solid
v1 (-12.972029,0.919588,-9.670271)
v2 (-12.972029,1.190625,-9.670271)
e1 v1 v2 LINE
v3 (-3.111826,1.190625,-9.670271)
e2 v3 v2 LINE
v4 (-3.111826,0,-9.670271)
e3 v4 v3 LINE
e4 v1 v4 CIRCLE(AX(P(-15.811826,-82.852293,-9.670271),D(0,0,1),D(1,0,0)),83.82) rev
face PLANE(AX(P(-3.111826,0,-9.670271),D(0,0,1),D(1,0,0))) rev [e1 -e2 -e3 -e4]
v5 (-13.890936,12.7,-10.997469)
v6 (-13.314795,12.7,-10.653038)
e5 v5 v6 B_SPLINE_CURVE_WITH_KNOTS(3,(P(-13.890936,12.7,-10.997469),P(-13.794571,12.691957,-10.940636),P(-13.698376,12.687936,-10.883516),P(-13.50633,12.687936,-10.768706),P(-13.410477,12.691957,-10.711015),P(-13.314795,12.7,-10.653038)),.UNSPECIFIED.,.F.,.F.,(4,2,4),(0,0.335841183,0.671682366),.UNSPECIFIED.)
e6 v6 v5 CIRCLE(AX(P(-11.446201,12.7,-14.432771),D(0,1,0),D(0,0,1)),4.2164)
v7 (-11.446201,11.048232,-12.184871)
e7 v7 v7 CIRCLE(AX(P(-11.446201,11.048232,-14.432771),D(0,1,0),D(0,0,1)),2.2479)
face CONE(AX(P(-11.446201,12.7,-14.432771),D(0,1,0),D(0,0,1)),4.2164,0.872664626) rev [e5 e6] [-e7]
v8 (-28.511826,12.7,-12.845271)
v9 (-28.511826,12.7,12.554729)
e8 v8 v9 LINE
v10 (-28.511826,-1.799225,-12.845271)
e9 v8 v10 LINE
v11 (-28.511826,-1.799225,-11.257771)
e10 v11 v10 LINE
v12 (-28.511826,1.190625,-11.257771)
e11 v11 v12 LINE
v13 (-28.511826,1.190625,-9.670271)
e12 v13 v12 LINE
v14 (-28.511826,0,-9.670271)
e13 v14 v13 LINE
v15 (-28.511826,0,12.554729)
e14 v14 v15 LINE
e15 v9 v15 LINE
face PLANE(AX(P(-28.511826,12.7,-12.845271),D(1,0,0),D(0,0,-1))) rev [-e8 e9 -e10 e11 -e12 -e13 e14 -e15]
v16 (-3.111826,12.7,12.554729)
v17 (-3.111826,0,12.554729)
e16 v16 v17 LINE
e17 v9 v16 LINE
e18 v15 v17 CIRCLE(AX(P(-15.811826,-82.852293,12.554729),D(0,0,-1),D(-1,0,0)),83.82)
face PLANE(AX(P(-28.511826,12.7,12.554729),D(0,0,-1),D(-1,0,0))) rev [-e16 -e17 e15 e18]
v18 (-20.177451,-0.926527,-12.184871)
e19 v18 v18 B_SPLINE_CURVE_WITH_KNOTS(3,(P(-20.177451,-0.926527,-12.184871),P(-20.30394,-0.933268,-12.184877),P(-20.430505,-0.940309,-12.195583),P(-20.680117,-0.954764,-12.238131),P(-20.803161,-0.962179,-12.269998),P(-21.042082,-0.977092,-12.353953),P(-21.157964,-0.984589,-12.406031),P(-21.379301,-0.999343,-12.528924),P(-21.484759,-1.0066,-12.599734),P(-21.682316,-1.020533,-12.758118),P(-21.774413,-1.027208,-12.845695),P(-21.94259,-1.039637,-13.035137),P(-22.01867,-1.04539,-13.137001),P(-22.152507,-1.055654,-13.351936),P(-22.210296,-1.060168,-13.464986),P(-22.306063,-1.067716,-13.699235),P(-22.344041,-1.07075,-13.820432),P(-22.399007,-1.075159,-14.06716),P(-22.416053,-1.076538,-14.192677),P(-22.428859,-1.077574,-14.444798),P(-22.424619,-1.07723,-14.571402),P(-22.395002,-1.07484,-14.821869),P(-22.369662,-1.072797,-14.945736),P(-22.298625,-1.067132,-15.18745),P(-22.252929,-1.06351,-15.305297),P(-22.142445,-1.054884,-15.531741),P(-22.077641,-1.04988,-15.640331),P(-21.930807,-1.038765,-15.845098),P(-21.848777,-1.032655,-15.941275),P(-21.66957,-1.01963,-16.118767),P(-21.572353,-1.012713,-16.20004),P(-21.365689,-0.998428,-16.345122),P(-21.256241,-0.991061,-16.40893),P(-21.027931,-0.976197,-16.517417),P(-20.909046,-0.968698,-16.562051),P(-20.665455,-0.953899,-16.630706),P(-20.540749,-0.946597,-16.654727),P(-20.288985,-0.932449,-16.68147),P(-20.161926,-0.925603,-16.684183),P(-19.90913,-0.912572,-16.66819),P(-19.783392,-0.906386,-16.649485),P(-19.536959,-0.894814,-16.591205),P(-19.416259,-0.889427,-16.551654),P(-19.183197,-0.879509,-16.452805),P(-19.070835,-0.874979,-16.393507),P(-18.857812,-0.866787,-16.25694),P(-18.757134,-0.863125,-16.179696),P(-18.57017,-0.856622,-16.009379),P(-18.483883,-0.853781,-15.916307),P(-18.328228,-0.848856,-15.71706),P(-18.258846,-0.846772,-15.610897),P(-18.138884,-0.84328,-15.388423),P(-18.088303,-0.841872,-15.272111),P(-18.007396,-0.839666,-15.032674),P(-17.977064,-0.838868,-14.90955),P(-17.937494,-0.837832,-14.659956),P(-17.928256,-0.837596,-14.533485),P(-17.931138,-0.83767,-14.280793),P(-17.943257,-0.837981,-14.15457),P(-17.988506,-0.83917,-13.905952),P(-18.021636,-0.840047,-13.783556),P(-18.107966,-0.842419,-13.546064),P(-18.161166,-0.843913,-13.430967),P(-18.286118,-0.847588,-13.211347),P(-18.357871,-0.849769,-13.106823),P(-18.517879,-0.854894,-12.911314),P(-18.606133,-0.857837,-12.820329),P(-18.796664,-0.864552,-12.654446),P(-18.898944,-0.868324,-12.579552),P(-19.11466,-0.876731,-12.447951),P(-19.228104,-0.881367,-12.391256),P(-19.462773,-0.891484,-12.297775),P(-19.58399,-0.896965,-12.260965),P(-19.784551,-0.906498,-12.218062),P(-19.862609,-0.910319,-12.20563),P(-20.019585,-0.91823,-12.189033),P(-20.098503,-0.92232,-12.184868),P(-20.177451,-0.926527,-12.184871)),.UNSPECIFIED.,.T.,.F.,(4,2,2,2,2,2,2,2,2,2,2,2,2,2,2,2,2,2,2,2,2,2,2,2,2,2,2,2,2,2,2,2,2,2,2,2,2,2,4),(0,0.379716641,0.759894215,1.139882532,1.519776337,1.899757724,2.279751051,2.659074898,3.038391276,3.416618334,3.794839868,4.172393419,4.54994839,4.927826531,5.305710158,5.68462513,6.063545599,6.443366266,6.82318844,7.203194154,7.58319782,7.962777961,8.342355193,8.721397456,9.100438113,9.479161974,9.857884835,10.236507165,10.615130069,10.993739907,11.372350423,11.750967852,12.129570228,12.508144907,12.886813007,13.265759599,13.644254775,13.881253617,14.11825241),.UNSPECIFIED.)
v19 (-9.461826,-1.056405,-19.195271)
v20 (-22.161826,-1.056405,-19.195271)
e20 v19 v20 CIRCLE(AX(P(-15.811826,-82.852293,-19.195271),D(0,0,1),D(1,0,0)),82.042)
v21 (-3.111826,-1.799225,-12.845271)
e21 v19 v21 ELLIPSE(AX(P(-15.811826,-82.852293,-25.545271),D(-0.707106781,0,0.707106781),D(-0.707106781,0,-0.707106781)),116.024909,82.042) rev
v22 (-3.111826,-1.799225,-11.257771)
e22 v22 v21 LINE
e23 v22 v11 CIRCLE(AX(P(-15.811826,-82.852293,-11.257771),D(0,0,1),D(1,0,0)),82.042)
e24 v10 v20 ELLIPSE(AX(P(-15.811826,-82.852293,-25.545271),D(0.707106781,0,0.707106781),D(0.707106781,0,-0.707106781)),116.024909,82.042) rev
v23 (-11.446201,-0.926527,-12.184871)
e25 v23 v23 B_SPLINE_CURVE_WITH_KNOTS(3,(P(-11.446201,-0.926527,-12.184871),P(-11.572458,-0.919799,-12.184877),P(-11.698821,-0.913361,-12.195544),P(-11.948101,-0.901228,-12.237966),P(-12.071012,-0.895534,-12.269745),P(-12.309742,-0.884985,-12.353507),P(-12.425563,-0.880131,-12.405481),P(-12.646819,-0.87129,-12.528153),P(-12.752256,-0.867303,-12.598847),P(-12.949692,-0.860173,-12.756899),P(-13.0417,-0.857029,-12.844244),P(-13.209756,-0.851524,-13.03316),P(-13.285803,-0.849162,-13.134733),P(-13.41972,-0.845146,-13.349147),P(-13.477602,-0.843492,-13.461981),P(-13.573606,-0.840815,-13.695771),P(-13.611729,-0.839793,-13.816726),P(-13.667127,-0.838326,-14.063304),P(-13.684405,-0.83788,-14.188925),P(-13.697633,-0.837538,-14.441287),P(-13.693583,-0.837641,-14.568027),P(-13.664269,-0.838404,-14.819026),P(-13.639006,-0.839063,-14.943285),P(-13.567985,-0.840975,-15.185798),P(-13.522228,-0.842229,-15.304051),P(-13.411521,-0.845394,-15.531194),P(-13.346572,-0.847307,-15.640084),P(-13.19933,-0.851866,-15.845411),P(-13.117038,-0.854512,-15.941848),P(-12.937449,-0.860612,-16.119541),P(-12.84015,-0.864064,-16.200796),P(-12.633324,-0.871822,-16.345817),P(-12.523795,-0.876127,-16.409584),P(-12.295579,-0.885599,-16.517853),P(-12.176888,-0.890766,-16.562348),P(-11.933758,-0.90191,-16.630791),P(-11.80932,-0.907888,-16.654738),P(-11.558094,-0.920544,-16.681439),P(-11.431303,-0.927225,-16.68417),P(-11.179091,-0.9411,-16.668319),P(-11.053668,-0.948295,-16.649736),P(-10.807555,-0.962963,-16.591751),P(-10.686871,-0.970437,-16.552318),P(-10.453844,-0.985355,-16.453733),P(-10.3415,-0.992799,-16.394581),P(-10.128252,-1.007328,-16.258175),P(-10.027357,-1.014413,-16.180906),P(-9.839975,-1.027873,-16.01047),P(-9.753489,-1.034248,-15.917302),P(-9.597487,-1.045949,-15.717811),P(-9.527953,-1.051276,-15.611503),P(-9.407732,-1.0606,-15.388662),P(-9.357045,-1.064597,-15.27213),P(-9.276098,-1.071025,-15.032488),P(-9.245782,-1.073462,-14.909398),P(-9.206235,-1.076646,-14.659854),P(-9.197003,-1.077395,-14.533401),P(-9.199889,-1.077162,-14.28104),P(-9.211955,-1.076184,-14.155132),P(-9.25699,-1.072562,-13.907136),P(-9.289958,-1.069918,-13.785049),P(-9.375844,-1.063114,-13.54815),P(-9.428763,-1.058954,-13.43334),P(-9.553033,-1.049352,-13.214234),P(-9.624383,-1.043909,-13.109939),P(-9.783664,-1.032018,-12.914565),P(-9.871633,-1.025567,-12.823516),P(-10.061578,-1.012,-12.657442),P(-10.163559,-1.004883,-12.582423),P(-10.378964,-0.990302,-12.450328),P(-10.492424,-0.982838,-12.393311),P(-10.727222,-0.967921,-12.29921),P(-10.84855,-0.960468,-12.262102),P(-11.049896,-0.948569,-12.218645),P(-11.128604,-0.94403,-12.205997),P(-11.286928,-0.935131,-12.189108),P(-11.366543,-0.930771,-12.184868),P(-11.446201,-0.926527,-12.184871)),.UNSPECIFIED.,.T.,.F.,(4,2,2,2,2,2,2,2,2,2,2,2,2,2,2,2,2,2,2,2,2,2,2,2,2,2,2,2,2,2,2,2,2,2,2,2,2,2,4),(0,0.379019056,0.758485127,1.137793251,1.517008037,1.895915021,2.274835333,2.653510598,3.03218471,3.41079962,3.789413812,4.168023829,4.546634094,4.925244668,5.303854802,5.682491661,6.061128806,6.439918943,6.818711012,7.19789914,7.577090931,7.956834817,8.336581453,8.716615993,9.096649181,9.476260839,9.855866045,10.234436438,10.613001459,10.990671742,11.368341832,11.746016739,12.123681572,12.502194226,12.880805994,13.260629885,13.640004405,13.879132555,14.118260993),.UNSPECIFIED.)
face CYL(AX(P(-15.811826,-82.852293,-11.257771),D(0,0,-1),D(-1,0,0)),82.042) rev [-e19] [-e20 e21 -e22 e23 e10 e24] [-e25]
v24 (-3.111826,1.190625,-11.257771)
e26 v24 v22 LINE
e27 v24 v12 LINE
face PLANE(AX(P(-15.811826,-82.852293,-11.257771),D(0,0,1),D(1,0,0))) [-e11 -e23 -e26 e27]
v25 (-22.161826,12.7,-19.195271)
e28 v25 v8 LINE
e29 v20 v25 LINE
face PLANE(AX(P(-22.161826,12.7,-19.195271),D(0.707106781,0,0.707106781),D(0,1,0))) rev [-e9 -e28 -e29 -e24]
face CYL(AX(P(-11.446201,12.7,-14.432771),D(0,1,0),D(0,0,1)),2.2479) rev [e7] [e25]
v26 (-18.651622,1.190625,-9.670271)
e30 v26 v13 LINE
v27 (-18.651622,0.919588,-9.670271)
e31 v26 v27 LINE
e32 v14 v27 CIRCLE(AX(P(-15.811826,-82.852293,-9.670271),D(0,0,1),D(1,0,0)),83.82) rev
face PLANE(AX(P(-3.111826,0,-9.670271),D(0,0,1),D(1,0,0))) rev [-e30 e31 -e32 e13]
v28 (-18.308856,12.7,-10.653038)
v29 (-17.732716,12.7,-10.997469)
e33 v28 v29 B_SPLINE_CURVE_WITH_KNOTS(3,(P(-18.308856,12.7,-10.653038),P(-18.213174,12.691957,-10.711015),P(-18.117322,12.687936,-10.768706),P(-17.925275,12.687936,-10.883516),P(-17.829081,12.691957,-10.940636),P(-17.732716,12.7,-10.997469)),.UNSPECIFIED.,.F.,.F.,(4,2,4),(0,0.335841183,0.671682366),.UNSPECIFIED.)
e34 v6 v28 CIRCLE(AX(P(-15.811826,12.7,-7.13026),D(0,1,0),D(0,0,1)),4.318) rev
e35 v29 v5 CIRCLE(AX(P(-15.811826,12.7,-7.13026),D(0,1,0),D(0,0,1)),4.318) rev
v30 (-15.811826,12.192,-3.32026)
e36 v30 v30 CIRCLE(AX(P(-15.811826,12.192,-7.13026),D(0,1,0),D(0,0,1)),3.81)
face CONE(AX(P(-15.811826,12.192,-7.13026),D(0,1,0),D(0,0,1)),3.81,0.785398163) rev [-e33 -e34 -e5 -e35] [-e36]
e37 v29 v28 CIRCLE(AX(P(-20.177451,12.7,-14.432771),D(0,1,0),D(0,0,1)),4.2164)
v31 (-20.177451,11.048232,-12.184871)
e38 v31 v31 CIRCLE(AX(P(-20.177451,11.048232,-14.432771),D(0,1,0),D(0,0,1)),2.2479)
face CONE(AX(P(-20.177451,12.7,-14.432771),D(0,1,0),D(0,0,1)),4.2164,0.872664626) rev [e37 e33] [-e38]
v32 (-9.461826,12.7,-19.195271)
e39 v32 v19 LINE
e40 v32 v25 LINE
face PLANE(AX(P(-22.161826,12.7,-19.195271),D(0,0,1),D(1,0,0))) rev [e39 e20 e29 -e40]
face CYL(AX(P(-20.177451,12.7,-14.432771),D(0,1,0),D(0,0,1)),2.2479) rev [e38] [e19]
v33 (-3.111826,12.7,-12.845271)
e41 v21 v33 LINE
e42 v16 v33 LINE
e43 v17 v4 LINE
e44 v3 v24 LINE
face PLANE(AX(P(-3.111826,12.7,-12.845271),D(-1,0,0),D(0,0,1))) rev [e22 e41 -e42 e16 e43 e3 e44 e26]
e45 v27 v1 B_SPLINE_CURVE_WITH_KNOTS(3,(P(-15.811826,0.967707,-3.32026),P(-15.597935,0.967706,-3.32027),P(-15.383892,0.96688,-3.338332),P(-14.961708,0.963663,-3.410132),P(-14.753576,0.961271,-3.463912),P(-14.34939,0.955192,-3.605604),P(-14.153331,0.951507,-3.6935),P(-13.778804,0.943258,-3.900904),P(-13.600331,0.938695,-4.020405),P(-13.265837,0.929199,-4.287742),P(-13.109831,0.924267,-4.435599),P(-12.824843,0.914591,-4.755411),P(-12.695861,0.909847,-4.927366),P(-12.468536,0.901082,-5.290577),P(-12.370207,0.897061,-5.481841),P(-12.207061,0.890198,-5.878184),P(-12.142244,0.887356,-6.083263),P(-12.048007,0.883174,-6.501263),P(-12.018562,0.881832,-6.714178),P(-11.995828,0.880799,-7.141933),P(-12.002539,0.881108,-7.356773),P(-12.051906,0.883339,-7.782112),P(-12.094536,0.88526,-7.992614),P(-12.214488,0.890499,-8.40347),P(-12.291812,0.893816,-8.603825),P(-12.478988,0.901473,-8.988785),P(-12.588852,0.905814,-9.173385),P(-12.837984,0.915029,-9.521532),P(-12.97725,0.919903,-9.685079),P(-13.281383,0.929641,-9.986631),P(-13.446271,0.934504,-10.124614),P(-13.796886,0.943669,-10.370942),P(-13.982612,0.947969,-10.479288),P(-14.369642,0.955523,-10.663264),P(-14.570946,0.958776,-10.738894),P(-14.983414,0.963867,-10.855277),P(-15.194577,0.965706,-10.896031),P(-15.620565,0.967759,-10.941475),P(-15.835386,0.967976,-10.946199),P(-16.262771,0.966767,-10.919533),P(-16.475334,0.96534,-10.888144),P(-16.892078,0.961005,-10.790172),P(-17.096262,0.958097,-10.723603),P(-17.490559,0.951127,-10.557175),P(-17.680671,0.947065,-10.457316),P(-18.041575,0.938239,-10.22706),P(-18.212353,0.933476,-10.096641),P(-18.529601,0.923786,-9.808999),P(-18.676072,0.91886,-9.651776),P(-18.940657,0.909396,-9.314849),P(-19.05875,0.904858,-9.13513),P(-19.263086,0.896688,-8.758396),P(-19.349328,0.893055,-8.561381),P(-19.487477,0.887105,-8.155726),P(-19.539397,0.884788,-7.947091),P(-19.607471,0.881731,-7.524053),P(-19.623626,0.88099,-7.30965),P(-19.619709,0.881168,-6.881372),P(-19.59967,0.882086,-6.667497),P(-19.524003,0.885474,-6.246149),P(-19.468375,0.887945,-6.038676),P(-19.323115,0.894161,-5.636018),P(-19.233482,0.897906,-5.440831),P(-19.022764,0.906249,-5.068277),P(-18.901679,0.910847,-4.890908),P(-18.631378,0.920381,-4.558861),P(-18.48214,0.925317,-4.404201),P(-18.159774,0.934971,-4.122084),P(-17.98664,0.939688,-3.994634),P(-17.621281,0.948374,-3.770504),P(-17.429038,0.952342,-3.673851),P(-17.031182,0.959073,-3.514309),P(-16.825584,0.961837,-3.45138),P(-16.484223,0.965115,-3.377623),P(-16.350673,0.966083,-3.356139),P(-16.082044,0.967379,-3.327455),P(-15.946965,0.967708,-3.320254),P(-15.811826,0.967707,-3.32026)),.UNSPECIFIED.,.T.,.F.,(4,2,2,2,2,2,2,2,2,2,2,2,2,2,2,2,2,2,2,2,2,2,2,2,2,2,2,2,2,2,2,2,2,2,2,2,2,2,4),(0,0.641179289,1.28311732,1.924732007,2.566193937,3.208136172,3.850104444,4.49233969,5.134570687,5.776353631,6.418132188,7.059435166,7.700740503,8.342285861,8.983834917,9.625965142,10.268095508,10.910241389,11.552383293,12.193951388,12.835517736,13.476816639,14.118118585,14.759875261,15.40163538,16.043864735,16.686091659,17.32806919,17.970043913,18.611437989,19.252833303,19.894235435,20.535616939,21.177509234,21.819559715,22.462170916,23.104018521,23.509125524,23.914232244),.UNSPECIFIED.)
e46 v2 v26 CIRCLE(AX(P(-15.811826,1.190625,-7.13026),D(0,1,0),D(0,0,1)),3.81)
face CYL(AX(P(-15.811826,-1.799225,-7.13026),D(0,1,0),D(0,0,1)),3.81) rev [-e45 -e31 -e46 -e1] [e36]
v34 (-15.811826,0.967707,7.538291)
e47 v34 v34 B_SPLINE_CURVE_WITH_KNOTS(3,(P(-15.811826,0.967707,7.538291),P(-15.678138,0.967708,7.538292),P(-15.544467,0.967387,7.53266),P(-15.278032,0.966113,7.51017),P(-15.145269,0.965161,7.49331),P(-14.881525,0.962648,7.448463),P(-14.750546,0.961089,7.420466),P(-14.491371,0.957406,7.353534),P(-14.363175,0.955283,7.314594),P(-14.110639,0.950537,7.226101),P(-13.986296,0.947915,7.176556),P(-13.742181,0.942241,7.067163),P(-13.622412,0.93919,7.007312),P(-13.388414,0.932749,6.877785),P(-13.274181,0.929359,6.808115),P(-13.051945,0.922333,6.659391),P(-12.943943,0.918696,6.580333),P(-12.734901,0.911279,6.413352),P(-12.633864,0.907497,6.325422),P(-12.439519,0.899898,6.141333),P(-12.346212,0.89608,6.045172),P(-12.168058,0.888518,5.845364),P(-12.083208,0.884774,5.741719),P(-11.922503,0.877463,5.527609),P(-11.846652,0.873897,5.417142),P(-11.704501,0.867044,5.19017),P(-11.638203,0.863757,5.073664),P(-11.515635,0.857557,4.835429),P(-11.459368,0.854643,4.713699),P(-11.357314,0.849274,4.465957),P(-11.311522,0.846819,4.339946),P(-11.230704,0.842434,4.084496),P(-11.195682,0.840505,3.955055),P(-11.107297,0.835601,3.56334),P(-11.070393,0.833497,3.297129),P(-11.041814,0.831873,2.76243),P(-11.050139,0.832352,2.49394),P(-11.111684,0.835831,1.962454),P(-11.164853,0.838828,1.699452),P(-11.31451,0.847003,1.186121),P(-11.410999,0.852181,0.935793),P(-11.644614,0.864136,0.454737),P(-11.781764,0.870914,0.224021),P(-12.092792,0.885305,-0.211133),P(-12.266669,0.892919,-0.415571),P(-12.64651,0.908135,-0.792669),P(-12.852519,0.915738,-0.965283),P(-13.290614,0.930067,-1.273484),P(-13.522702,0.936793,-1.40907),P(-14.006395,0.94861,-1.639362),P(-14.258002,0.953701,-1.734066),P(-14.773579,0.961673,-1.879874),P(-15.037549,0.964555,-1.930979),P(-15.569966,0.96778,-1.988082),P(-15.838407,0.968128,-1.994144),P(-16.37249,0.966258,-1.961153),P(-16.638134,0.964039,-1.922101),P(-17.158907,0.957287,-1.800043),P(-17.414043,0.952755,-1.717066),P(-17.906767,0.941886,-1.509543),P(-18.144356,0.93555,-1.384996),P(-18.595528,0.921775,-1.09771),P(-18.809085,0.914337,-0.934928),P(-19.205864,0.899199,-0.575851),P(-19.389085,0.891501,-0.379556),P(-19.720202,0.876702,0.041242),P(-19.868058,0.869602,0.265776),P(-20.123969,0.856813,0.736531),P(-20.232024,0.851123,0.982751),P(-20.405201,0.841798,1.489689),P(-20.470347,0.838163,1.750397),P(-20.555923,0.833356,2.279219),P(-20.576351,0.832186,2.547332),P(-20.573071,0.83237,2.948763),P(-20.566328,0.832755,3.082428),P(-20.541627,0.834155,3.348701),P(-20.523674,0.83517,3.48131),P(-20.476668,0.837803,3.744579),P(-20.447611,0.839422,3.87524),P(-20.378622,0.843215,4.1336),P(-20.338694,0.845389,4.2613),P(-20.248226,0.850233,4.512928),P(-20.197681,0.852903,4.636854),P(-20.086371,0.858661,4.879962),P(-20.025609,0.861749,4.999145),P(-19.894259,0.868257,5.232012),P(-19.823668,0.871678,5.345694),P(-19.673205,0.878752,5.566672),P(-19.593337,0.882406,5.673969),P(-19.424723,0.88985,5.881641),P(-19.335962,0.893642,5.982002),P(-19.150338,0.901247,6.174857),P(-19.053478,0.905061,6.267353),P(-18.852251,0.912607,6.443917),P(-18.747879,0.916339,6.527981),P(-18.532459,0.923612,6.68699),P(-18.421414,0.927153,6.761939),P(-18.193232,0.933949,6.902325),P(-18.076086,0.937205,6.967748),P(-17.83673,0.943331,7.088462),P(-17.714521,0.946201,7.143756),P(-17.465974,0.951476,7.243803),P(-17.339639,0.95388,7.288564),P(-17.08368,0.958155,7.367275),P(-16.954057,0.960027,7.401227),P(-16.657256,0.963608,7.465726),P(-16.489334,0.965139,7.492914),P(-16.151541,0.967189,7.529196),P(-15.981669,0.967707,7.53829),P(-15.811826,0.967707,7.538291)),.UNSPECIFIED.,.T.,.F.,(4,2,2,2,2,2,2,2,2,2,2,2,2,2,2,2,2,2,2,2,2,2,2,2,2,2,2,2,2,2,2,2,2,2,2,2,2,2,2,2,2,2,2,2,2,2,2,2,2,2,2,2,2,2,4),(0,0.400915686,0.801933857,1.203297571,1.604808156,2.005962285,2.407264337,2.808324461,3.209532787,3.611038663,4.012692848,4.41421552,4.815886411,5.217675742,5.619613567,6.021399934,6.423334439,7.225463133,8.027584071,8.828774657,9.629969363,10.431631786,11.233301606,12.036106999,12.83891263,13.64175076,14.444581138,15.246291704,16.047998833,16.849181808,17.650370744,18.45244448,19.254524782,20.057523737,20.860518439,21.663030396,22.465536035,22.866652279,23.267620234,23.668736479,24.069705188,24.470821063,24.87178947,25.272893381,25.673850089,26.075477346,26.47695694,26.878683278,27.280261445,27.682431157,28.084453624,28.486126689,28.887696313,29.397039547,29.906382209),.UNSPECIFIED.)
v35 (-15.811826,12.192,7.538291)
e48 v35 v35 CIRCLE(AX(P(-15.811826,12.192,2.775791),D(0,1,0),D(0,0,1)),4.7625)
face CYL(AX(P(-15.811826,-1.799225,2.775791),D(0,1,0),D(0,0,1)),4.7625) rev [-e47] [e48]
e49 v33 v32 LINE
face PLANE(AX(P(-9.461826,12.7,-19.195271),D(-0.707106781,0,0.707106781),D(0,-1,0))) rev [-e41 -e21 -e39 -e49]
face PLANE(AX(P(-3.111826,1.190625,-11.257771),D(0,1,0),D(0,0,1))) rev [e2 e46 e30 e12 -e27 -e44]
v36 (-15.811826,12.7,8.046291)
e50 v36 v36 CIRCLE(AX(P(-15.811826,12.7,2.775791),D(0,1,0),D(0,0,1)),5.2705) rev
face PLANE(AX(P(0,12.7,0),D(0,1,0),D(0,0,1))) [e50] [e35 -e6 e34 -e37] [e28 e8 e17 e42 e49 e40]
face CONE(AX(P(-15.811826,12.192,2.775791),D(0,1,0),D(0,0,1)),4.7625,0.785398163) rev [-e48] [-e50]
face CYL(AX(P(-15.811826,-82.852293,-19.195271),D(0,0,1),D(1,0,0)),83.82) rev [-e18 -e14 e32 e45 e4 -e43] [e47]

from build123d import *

# Parameters (mm, degrees)
BOSS_EXTRUDE1_DEPTH                               = 12.7
CUT_EXTRUDE1_DEPTH                                = 45.522766139
CUT_EXTRUDE1_DEPTH_BACK                           = 45.522766139
SKETCH2_R                                         = 83.82
BOSS_EXTRUDE2_DEPTH                               = 7.9375
CHAMFER1_SIZE                                     = 6.35
CSK_FOR_8_FLAT_HEAD_MACHINE_SCREW_100_D           = 4.4958
CSK_FOR_8_FLAT_HEAD_MACHINE_SCREW_100_CSINK_D     = 8.4328
CSK_FOR_8_FLAT_HEAD_MACHINE_SCREW_100_CSINK_ANGLE = 100
SKETCH6_R                                         = 1.631947848
SKETCH6_R_2                                       = 1.523937663
CUT_EXTRUDE2_DEPTH                                = 38.304291688
SKETCH7_W                                         = 1.5875
SKETCH7_H                                         = 1.190625
CUT_EXTRUDE3_DEPTH                                = 35.276937503
SKETCH8_R                                         = 4.7625
SKETCH8_R_2                                       = 3.81
CUT_EXTRUDE4_DEPTH                                = 38.304291688
CHAMFER2_SIZE                                     = 0.508


with BuildPart() as part:
    # Sketch1 → Boss-Extrude1 (new body)
    with BuildSketch(Plane(origin=(0, 0, 0), x_dir=(1, 0, 0), z_dir=(0, 1, 0))):
        Polygon((-28.511825699, 12.845271113), (-22.161825699, 19.195271113), (-9.461825699, 19.195271113), (-3.111825699, 12.845271113), (-3.111825699, -12.554728887), (-28.511825699, -12.554728887), align=None)
    extrude(amount=BOSS_EXTRUDE1_DEPTH)

    # Sketch2 → Cut-Extrude1 (cut, two sides: drawn at the far end of the back side and taken through both)
    with BuildSketch(Plane.XY.offset(12.554728887).offset(-CUT_EXTRUDE1_DEPTH_BACK)):
        with Locations((-15.811825699, -82.852292666)):
            Circle(SKETCH2_R)
    extrude(amount=CUT_EXTRUDE1_DEPTH + CUT_EXTRUDE1_DEPTH_BACK, mode=Mode.SUBTRACT)

    # Sketch5 → Boss-Extrude2 (add)
    with BuildSketch(Plane(origin=(0, 0, -19.195271113), x_dir=(-1, 0, 0), z_dir=(0, 0, -1))):
        with BuildLine():
            Line((3.111825699, 12.7), (3.111825699, 0))
            Line((3.111825699, 0), (3.111825699, -1.799225087))
            ThreePointArc((3.111825699, -1.799225087), (15.811825699, -0.810292666), (28.511825699, -1.799225087))
            Line((28.511825699, -1.799225087), (28.511825699, 0))
            Line((28.511825699, 0), (28.511825699, 12.7))
            Line((28.511825699, 12.7), (3.111825699, 12.7))
        make_face()
    extrude(amount=-BOSS_EXTRUDE2_DEPTH)

    # Chamfer1
    chamfer1_edges = [part.edges().sort_by_distance(p)[0] for p in [
        (-3.111825699, 5.450387457, -19.195271113),
        (-28.511825699, 5.450387457, -19.195271113),
    ]]
    chamfer(chamfer1_edges, length=CHAMFER1_SIZE)

    # CSK for #8 Flat Head Machine Screw (100)1 (through all)
    with Locations(Plane(origin=(0, 12.7, 0), x_dir=(1, 0, 0), z_dir=(0, 1, 0))):
        with Locations((-20.177450699, 14.432771113), (-11.446200699, 14.432771113)):
            CounterSinkHole(CSK_FOR_8_FLAT_HEAD_MACHINE_SCREW_100_D / 2, CSK_FOR_8_FLAT_HEAD_MACHINE_SCREW_100_CSINK_D / 2, counter_sink_angle=CSK_FOR_8_FLAT_HEAD_MACHINE_SCREW_100_CSINK_ANGLE)

    # Sketch6 → Cut-Extrude2 (cut, through all)
    with BuildSketch(Plane(origin=(0, 12.7, 0), x_dir=(1, 0, 0), z_dir=(0, 1, 0))):
        with Locations(Location((-15.811825699, 7.130260145, 0), (0, 0, 270))):
            Circle(SKETCH6_R)
        with Locations(Location((-15.811825699, -2.775791253, 0), (0, 0, 270))):
            Circle(SKETCH6_R_2)
    extrude(amount=-CUT_EXTRUDE2_DEPTH, mode=Mode.SUBTRACT)

    # Sketch7 → Cut-Extrude3 (cut, through all)
    with BuildSketch(Plane.ZY.offset(28.511825699)):
        with Locations((-10.464021113, 0.5953125)):
            Rectangle(SKETCH7_W, SKETCH7_H)
    extrude(amount=-CUT_EXTRUDE3_DEPTH, mode=Mode.SUBTRACT)

    # Sketch8 → Cut-Extrude4 (cut, through all)
    with BuildSketch(Plane(origin=(0, 12.7, 0), x_dir=(1, 0, 0), z_dir=(0, 1, 0))):
        with Locations(Location((-15.811825699, -2.775791253, 0), (0, 0, 270))):
            Circle(SKETCH8_R)
        with Locations(Location((-15.811825699, 7.130260145, 0), (0, 0, 270))):
            Circle(SKETCH8_R_2)
    extrude(amount=-CUT_EXTRUDE4_DEPTH, mode=Mode.SUBTRACT)

    # Chamfer2
    # the kernel refuses this chamfer: 0.508 mm, written as the material it takes off along each edge
    with BuildSketch(Plane(origin=(-15.811825699, 12.7, 2.775791253), x_dir=(0, 0, 1), z_dir=(-1, 0, 0))) as chamfer2_piece_1:
        Polygon((4.7625 + CHAMFER2_SIZE, 0), (4.7625, -CHAMFER2_SIZE), (4.7625, 0), align=None)
    revolve(axis=Axis((-15.811825699, 12.7, 2.775791253), (0, 1, 0)), mode=Mode.SUBTRACT)
    with BuildSketch(Plane(origin=(-15.811825699, 12.7, -7.130260145), x_dir=(0, 0, 1), z_dir=(-1, 0, 0))) as chamfer2_piece_2:
        Polygon((3.81 + CHAMFER2_SIZE, 0), (3.81, -CHAMFER2_SIZE), (3.81, 0), align=None)
    revolve(axis=Axis((-15.811825699, 12.7, -7.130260145), (0, 1, 0)), mode=Mode.SUBTRACT)


solid = part.part
